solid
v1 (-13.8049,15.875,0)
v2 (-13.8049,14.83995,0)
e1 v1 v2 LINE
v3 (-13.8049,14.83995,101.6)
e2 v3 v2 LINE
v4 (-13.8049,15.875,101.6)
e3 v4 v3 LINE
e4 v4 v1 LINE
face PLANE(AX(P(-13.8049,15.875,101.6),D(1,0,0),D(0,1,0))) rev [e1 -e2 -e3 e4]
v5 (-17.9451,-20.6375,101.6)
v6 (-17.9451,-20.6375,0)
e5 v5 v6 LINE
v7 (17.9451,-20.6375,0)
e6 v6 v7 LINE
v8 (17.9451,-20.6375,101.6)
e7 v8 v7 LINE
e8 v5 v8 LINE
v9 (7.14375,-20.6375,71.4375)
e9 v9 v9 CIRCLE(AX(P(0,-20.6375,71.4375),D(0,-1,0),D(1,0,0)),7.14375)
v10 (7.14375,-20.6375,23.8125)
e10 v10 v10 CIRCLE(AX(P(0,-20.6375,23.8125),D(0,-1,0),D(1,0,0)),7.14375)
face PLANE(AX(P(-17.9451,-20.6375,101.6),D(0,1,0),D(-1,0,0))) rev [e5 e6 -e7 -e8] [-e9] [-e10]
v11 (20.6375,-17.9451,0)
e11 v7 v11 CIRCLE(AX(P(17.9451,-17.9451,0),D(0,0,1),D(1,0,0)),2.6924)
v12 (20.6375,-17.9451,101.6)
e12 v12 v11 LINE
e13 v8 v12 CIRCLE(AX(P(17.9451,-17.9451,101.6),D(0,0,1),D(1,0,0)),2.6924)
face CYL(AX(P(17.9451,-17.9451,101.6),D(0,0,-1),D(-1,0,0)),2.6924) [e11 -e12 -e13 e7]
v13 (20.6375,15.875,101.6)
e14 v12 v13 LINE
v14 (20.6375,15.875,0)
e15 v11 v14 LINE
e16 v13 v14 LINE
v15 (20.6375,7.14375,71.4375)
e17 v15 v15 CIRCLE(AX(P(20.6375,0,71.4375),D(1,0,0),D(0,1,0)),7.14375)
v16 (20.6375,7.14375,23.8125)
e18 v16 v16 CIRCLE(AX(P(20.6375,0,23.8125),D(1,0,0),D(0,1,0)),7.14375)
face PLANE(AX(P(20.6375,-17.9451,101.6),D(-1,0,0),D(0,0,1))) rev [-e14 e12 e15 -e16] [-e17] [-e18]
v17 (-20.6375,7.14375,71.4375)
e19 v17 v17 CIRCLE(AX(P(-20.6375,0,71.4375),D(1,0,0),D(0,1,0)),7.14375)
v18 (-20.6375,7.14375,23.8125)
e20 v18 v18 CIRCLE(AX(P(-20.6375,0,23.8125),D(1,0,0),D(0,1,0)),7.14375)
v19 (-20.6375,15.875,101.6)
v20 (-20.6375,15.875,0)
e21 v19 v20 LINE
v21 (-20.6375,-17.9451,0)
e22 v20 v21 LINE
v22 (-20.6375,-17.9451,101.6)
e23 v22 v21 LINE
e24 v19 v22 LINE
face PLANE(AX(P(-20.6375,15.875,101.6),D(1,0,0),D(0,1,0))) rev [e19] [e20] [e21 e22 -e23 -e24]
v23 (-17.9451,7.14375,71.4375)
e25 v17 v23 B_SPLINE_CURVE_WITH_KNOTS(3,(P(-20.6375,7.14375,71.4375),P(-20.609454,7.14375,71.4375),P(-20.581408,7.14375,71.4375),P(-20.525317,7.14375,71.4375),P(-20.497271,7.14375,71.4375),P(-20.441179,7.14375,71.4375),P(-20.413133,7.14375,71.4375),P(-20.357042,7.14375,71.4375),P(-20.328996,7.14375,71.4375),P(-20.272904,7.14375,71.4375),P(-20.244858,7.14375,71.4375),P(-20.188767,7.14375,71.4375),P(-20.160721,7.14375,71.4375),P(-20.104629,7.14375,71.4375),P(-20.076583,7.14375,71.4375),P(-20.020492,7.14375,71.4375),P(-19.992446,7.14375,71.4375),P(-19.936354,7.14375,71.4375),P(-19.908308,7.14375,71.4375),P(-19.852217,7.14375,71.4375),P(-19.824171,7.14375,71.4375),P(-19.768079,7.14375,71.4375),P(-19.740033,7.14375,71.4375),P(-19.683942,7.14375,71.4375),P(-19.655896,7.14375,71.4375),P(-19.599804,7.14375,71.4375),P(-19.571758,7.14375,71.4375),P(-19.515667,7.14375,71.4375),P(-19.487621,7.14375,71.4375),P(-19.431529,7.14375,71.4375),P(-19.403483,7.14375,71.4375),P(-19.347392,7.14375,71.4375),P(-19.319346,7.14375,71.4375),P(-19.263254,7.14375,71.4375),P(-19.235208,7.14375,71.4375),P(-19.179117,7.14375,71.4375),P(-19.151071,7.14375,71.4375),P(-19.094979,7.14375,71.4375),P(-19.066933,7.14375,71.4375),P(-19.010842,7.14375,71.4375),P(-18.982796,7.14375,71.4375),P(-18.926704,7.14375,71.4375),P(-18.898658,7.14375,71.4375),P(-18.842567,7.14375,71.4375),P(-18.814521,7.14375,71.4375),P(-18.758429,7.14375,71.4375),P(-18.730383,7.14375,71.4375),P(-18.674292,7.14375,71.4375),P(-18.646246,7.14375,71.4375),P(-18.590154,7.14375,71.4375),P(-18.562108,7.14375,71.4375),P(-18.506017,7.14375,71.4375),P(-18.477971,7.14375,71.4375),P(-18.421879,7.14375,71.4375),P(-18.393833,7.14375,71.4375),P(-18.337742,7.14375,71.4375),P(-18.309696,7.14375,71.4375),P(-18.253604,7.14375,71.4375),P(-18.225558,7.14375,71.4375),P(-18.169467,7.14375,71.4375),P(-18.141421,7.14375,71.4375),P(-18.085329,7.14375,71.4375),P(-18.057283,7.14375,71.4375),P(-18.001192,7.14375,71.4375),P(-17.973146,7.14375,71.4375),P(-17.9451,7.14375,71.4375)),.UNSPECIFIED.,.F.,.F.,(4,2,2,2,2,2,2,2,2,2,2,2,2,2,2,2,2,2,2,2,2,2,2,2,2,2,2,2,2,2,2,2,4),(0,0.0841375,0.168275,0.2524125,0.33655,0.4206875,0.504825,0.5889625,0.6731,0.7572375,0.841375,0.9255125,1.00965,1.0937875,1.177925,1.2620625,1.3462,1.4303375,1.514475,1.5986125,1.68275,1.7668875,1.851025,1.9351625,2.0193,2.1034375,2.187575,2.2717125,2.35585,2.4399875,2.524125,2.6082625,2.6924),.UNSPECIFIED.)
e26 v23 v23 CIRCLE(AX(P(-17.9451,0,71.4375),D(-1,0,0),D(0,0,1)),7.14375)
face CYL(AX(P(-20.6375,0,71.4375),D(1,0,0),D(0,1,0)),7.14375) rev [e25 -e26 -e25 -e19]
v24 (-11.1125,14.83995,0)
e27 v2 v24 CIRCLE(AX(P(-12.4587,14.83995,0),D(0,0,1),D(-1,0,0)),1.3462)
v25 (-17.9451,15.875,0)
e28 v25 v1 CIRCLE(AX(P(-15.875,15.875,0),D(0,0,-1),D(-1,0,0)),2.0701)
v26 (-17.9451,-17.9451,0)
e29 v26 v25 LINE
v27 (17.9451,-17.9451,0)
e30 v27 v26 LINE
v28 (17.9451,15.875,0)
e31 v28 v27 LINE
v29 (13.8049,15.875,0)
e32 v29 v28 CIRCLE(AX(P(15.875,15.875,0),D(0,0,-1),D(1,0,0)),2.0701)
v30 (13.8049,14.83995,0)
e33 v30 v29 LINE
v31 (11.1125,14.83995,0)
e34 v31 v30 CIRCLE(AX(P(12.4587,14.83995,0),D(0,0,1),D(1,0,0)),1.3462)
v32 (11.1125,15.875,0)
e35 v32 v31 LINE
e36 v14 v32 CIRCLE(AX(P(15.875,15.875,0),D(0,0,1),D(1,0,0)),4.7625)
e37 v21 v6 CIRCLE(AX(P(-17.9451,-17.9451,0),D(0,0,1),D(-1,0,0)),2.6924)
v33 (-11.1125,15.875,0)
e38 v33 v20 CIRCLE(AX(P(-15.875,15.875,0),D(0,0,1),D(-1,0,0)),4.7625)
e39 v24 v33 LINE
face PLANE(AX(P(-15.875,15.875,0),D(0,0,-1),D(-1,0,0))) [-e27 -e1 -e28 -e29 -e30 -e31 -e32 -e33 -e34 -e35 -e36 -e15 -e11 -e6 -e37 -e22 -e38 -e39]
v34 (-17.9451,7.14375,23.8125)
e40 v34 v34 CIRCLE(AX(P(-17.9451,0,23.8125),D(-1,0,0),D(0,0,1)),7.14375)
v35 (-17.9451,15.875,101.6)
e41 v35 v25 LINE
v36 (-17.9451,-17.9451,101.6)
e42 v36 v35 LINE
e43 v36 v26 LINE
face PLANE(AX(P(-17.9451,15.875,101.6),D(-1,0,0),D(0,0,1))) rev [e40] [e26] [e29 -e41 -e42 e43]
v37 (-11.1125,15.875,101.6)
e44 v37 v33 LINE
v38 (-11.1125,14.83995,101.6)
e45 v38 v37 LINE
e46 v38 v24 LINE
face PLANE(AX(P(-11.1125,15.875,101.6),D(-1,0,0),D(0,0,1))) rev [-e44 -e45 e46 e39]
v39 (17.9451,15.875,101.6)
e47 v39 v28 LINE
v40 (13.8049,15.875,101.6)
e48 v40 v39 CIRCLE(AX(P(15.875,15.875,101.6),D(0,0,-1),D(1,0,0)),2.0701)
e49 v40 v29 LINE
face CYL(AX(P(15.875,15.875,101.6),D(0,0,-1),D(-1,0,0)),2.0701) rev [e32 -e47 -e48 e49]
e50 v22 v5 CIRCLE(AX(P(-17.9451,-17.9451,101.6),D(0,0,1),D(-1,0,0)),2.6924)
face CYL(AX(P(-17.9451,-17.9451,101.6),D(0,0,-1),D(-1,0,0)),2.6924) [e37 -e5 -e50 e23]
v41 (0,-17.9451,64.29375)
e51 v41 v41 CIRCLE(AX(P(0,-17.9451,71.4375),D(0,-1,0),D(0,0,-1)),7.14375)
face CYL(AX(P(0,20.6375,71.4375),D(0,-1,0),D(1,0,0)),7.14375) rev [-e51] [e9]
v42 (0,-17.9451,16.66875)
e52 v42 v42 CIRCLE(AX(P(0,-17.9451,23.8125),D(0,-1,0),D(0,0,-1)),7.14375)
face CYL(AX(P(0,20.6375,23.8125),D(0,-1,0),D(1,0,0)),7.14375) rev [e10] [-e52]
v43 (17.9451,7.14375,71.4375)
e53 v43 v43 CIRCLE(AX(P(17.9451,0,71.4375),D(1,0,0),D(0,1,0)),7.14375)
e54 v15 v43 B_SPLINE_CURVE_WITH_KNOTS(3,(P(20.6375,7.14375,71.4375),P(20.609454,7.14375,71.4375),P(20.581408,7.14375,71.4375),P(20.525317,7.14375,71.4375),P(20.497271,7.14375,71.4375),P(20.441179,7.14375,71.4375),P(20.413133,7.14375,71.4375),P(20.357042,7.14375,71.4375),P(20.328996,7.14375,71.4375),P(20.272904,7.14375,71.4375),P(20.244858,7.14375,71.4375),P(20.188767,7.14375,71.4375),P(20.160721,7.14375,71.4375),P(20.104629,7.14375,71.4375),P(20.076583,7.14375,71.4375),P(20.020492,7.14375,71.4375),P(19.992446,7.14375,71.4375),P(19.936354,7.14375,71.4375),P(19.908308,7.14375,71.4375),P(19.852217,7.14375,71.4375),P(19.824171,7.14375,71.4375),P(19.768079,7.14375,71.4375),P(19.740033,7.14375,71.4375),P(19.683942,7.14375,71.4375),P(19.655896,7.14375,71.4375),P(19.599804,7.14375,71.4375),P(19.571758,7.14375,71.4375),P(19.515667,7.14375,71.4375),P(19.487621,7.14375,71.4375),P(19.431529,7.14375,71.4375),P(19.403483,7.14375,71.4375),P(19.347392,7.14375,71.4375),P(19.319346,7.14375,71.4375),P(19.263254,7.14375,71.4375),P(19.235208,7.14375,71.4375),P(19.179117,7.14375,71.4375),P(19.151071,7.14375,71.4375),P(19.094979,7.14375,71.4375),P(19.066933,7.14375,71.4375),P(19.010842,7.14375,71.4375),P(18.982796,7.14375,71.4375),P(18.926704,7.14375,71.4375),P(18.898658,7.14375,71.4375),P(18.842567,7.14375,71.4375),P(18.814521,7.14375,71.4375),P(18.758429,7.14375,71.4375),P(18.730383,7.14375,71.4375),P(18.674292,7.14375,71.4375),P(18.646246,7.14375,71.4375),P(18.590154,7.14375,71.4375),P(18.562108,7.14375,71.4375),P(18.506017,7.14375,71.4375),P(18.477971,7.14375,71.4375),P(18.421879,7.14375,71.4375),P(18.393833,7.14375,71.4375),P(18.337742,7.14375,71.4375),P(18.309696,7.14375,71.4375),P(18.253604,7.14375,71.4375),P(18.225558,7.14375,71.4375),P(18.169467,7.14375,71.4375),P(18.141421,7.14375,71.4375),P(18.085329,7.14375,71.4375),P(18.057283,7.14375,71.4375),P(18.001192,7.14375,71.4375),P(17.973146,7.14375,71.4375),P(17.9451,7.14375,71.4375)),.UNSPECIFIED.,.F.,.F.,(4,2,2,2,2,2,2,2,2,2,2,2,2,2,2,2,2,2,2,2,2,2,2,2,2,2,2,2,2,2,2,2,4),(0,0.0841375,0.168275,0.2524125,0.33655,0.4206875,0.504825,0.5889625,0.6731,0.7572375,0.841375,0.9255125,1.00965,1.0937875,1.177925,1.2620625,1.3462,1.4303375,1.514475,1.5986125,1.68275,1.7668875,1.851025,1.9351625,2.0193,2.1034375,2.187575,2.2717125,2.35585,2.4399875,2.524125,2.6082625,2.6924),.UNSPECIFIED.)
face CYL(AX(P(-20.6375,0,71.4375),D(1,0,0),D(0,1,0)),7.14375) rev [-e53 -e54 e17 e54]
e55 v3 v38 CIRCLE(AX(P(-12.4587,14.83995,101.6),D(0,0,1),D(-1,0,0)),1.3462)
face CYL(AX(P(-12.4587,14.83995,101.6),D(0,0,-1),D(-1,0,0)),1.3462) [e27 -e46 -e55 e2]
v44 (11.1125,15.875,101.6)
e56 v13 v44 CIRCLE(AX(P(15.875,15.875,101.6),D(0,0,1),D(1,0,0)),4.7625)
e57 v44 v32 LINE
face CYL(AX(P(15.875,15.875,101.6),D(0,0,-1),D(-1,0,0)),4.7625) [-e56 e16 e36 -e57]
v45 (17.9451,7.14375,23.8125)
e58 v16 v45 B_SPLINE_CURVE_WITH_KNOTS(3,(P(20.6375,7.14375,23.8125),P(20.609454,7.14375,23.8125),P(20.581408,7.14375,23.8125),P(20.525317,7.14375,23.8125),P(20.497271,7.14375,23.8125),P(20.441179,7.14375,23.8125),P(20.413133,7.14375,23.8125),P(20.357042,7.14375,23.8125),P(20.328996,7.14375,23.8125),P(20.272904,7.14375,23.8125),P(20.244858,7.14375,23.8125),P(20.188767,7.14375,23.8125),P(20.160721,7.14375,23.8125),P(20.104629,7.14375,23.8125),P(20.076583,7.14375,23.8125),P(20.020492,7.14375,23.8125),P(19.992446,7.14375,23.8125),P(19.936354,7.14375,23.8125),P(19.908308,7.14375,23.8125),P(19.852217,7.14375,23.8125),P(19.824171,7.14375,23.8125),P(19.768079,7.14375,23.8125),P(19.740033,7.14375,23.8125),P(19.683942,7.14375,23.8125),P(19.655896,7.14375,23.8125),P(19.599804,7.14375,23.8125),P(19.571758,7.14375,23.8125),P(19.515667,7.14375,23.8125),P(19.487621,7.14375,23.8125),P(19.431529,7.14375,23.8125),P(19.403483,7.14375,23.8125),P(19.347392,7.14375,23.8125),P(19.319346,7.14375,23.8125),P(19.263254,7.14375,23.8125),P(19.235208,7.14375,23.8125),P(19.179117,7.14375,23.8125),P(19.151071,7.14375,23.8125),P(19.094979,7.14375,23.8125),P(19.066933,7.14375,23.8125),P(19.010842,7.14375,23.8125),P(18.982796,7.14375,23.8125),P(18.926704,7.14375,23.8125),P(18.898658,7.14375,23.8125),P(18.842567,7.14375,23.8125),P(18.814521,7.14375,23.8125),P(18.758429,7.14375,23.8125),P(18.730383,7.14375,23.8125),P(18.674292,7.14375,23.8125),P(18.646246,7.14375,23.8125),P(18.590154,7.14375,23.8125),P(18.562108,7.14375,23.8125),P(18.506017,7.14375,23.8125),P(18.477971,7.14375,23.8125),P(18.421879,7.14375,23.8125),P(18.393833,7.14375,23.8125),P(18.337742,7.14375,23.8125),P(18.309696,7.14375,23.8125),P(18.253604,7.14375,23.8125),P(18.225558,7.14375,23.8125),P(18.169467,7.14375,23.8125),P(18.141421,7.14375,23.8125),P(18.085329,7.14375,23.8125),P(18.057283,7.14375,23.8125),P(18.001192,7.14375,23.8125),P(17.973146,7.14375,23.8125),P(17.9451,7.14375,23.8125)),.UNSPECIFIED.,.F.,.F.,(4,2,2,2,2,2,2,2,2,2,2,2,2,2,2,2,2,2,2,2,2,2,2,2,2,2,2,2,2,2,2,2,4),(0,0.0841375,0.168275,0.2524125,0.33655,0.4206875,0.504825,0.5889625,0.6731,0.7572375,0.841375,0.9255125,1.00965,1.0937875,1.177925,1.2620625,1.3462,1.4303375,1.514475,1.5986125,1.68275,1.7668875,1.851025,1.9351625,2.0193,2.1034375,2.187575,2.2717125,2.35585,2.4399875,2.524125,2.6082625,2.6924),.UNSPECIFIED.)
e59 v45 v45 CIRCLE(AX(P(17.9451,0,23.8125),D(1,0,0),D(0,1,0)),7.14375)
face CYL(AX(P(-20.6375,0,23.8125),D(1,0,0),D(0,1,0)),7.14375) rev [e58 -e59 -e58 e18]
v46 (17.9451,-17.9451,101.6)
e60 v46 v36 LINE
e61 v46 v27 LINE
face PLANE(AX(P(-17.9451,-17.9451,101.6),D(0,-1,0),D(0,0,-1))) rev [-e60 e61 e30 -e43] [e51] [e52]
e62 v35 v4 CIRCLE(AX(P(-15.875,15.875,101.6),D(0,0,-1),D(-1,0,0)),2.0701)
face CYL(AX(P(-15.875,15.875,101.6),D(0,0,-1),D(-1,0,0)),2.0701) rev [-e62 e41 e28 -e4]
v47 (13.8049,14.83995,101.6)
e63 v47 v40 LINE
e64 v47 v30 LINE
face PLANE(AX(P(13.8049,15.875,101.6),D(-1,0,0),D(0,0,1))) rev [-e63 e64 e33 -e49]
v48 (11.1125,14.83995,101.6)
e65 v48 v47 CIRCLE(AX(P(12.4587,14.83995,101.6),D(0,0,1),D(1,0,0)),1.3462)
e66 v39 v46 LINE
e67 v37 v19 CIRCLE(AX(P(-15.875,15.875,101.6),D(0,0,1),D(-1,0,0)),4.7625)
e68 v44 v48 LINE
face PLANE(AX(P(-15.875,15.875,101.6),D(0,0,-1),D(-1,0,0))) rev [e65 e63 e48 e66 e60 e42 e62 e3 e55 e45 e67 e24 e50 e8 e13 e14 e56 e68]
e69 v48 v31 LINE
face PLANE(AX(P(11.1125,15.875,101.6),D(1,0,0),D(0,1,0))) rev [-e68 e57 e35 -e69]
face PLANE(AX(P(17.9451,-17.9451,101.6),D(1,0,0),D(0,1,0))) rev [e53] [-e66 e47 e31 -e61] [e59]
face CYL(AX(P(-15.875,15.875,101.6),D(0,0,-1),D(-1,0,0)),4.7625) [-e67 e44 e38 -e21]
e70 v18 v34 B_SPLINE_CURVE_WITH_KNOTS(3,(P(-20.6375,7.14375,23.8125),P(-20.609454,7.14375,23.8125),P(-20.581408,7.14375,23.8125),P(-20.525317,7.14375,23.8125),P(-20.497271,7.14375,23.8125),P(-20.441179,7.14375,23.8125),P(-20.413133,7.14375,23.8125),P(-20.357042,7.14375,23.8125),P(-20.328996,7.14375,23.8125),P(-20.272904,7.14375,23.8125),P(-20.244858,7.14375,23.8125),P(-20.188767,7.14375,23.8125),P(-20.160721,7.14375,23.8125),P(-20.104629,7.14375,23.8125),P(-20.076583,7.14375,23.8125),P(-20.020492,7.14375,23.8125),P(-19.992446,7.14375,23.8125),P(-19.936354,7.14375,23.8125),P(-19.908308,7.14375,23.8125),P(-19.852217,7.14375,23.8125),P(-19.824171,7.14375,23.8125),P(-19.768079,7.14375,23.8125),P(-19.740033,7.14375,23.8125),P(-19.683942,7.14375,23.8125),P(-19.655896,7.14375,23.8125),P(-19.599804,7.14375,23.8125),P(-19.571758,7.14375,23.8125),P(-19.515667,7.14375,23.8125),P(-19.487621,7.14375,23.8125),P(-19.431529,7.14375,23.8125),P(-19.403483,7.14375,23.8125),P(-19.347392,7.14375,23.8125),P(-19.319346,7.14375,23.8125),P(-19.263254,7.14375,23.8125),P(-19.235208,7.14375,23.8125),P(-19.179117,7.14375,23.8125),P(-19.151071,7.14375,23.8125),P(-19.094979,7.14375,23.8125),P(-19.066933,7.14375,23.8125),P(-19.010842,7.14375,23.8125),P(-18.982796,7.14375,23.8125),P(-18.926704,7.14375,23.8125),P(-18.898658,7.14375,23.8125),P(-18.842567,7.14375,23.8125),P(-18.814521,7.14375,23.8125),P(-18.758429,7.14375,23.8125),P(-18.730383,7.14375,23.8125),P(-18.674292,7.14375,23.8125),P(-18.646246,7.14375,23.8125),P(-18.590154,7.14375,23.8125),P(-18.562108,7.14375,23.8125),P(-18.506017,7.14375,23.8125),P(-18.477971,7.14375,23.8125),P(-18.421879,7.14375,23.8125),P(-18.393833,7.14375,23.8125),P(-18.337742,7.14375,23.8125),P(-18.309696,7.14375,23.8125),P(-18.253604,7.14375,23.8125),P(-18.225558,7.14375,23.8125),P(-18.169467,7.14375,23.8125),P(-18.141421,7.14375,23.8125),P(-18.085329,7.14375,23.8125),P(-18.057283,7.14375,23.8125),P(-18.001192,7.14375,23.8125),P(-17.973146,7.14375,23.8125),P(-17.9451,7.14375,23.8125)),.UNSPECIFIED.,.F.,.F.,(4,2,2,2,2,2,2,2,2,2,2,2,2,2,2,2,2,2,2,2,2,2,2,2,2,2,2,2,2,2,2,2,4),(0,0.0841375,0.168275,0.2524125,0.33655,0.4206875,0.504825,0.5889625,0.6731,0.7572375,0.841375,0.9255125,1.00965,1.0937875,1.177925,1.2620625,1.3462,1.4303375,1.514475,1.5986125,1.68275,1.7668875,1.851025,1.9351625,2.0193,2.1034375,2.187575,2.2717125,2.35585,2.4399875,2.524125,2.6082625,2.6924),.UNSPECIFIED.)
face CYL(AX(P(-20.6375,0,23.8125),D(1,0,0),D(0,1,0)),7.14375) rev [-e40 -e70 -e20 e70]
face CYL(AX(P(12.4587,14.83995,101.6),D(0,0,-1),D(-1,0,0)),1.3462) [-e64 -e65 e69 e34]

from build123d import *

# Parameters (mm, degrees)
BASE_EXTRUDE_DEPTH                        = 101.6
HOLE1_START                               = -20.6375
HOLE1_OUTLINE_R                           = 7.14375
HOLE1_DEPTH                               = 2.6924
LPATTERN1_COUNT                           = 2
LPATTERN1_PITCH                           = 47.625
CIRPATTERN1_COUNT                         = 2
CIRPATTERN1_ANGLE                         = 90
CIRPATTERN1_START                         = -20.6375
CIRPATTERN1_COPY_1_SKETCH_R               = 7.14375
CIRPATTERN1_COPY_1_DEPTH                  = 2.6924
CIRPATTERN1_THE_OTHER_WAY_COUNT           = 2
CIRPATTERN1_THE_OTHER_WAY_ANGLE           = 90
CIRPATTERN1_THE_OTHER_WAY_COPY_1_SKETCH_R = 7.14375
CIRPATTERN1_THE_OTHER_WAY_COPY_1_DEPTH    = 2.6924


# Read off the part's stored shape, not the designer's step: Hole1
with BuildPart() as part:
    # Sketch1 → Base-Extrude (new body)
    with BuildSketch(Plane.XY):
        with BuildLine():
            Line((-20.6375, 15.875), (-20.6375, -17.9451))
            ThreePointArc((-20.6375, -17.9451), (-19.848914298, -19.848914298), (-17.9451, -20.6375))
            Line((-17.9451, -20.6375), (17.9451, -20.6375))
            ThreePointArc((17.9451, -20.6375), (19.848914298, -19.848914298), (20.6375, -17.9451))
            Line((20.6375, -17.9451), (20.6375, 15.875))
            ThreePointArc((20.6375, 15.875), (15.875, 20.6375), (11.1125, 15.875))
            Line((11.1125, 15.875), (11.1125, 14.83995))
            ThreePointArc((11.1125, 14.83995), (12.4587, 13.49375), (13.8049, 14.83995))
            Line((13.8049, 14.83995), (13.8049, 15.875))
            ThreePointArc((13.8049, 15.875), (15.875, 17.9451), (17.9451, 15.875))
            Line((17.9451, 15.875), (17.9451, -17.9451))
            Line((17.9451, -17.9451), (-17.9451, -17.9451))
            Line((-17.9451, -17.9451), (-17.9451, 15.875))
            ThreePointArc((-17.9451, 15.875), (-15.875, 17.9451), (-13.8049, 15.875))
            Line((-13.8049, 15.875), (-13.8049, 14.83995))
            ThreePointArc((-13.8049, 14.83995), (-12.4587, 13.49375), (-11.1125, 14.83995))
            Line((-11.1125, 14.83995), (-11.1125, 15.875))
            ThreePointArc((-11.1125, 15.875), (-15.875, 20.6375), (-20.6375, 15.875))
        make_face()
    extrude(amount=BASE_EXTRUDE_DEPTH)

    # Hole1 outline → Hole1 (cut)
    with BuildSketch(Plane(origin=(0, 0, 0), x_dir=(1, 0, 0), z_dir=(0, 1, 0)).offset(HOLE1_START)):
        with Locations((0, -23.8125)):
            Circle(HOLE1_OUTLINE_R)
    hole1 = extrude(amount=HOLE1_DEPTH, mode=Mode.SUBTRACT)

    # LPattern1: Hole1 ×2
    with Locations(*[(0, 0, i * LPATTERN1_PITCH) for i in range(1, LPATTERN1_COUNT)]):
        add(hole1, mode=Mode.SUBTRACT)

    # CirPattern1: Hole1 ×2 about axis
    cirpattern1_axis = Axis((0, 0, -50), (0, 0, 1))
    for i in range(1, CIRPATTERN1_COUNT):
        add(hole1.rotate(cirpattern1_axis, i * CIRPATTERN1_ANGLE / (CIRPATTERN1_COUNT - 1)), mode=Mode.SUBTRACT)

    # CirPattern1 copy 1 sketch → CirPattern1 copy 1 (cut)
    with BuildSketch(Plane(origin=(0, 0, 47.625), x_dir=(0, 1, 0), z_dir=(-1, 0, 0)).offset(CIRPATTERN1_START)):
        with Locations((0, -23.8125)):
            Circle(CIRPATTERN1_COPY_1_SKETCH_R)
    extrude(amount=CIRPATTERN1_COPY_1_DEPTH, mode=Mode.SUBTRACT)

    # CirPattern1 the other way: Hole1 ×2 about axis
    cirpattern1_the_other_way_axis = Axis((0, 0, -50), (0, 0, -1))
    for i in range(1, CIRPATTERN1_THE_OTHER_WAY_COUNT):
        add(hole1.rotate(cirpattern1_the_other_way_axis, i * CIRPATTERN1_THE_OTHER_WAY_ANGLE / (CIRPATTERN1_THE_OTHER_WAY_COUNT - 1)), mode=Mode.SUBTRACT)

    # CirPattern1 the other way copy 1 sketch → CirPattern1 the other way copy 1 (cut)
    with BuildSketch(Plane(origin=(0, 0, 47.625), x_dir=(0, -1, 0), z_dir=(1, 0, 0)).offset(CIRPATTERN1_START)):
        with Locations((0, -23.8125)):
            Circle(CIRPATTERN1_THE_OTHER_WAY_COPY_1_SKETCH_R)
    extrude(amount=CIRPATTERN1_THE_OTHER_WAY_COPY_1_DEPTH, mode=Mode.SUBTRACT)


solid = part.part
